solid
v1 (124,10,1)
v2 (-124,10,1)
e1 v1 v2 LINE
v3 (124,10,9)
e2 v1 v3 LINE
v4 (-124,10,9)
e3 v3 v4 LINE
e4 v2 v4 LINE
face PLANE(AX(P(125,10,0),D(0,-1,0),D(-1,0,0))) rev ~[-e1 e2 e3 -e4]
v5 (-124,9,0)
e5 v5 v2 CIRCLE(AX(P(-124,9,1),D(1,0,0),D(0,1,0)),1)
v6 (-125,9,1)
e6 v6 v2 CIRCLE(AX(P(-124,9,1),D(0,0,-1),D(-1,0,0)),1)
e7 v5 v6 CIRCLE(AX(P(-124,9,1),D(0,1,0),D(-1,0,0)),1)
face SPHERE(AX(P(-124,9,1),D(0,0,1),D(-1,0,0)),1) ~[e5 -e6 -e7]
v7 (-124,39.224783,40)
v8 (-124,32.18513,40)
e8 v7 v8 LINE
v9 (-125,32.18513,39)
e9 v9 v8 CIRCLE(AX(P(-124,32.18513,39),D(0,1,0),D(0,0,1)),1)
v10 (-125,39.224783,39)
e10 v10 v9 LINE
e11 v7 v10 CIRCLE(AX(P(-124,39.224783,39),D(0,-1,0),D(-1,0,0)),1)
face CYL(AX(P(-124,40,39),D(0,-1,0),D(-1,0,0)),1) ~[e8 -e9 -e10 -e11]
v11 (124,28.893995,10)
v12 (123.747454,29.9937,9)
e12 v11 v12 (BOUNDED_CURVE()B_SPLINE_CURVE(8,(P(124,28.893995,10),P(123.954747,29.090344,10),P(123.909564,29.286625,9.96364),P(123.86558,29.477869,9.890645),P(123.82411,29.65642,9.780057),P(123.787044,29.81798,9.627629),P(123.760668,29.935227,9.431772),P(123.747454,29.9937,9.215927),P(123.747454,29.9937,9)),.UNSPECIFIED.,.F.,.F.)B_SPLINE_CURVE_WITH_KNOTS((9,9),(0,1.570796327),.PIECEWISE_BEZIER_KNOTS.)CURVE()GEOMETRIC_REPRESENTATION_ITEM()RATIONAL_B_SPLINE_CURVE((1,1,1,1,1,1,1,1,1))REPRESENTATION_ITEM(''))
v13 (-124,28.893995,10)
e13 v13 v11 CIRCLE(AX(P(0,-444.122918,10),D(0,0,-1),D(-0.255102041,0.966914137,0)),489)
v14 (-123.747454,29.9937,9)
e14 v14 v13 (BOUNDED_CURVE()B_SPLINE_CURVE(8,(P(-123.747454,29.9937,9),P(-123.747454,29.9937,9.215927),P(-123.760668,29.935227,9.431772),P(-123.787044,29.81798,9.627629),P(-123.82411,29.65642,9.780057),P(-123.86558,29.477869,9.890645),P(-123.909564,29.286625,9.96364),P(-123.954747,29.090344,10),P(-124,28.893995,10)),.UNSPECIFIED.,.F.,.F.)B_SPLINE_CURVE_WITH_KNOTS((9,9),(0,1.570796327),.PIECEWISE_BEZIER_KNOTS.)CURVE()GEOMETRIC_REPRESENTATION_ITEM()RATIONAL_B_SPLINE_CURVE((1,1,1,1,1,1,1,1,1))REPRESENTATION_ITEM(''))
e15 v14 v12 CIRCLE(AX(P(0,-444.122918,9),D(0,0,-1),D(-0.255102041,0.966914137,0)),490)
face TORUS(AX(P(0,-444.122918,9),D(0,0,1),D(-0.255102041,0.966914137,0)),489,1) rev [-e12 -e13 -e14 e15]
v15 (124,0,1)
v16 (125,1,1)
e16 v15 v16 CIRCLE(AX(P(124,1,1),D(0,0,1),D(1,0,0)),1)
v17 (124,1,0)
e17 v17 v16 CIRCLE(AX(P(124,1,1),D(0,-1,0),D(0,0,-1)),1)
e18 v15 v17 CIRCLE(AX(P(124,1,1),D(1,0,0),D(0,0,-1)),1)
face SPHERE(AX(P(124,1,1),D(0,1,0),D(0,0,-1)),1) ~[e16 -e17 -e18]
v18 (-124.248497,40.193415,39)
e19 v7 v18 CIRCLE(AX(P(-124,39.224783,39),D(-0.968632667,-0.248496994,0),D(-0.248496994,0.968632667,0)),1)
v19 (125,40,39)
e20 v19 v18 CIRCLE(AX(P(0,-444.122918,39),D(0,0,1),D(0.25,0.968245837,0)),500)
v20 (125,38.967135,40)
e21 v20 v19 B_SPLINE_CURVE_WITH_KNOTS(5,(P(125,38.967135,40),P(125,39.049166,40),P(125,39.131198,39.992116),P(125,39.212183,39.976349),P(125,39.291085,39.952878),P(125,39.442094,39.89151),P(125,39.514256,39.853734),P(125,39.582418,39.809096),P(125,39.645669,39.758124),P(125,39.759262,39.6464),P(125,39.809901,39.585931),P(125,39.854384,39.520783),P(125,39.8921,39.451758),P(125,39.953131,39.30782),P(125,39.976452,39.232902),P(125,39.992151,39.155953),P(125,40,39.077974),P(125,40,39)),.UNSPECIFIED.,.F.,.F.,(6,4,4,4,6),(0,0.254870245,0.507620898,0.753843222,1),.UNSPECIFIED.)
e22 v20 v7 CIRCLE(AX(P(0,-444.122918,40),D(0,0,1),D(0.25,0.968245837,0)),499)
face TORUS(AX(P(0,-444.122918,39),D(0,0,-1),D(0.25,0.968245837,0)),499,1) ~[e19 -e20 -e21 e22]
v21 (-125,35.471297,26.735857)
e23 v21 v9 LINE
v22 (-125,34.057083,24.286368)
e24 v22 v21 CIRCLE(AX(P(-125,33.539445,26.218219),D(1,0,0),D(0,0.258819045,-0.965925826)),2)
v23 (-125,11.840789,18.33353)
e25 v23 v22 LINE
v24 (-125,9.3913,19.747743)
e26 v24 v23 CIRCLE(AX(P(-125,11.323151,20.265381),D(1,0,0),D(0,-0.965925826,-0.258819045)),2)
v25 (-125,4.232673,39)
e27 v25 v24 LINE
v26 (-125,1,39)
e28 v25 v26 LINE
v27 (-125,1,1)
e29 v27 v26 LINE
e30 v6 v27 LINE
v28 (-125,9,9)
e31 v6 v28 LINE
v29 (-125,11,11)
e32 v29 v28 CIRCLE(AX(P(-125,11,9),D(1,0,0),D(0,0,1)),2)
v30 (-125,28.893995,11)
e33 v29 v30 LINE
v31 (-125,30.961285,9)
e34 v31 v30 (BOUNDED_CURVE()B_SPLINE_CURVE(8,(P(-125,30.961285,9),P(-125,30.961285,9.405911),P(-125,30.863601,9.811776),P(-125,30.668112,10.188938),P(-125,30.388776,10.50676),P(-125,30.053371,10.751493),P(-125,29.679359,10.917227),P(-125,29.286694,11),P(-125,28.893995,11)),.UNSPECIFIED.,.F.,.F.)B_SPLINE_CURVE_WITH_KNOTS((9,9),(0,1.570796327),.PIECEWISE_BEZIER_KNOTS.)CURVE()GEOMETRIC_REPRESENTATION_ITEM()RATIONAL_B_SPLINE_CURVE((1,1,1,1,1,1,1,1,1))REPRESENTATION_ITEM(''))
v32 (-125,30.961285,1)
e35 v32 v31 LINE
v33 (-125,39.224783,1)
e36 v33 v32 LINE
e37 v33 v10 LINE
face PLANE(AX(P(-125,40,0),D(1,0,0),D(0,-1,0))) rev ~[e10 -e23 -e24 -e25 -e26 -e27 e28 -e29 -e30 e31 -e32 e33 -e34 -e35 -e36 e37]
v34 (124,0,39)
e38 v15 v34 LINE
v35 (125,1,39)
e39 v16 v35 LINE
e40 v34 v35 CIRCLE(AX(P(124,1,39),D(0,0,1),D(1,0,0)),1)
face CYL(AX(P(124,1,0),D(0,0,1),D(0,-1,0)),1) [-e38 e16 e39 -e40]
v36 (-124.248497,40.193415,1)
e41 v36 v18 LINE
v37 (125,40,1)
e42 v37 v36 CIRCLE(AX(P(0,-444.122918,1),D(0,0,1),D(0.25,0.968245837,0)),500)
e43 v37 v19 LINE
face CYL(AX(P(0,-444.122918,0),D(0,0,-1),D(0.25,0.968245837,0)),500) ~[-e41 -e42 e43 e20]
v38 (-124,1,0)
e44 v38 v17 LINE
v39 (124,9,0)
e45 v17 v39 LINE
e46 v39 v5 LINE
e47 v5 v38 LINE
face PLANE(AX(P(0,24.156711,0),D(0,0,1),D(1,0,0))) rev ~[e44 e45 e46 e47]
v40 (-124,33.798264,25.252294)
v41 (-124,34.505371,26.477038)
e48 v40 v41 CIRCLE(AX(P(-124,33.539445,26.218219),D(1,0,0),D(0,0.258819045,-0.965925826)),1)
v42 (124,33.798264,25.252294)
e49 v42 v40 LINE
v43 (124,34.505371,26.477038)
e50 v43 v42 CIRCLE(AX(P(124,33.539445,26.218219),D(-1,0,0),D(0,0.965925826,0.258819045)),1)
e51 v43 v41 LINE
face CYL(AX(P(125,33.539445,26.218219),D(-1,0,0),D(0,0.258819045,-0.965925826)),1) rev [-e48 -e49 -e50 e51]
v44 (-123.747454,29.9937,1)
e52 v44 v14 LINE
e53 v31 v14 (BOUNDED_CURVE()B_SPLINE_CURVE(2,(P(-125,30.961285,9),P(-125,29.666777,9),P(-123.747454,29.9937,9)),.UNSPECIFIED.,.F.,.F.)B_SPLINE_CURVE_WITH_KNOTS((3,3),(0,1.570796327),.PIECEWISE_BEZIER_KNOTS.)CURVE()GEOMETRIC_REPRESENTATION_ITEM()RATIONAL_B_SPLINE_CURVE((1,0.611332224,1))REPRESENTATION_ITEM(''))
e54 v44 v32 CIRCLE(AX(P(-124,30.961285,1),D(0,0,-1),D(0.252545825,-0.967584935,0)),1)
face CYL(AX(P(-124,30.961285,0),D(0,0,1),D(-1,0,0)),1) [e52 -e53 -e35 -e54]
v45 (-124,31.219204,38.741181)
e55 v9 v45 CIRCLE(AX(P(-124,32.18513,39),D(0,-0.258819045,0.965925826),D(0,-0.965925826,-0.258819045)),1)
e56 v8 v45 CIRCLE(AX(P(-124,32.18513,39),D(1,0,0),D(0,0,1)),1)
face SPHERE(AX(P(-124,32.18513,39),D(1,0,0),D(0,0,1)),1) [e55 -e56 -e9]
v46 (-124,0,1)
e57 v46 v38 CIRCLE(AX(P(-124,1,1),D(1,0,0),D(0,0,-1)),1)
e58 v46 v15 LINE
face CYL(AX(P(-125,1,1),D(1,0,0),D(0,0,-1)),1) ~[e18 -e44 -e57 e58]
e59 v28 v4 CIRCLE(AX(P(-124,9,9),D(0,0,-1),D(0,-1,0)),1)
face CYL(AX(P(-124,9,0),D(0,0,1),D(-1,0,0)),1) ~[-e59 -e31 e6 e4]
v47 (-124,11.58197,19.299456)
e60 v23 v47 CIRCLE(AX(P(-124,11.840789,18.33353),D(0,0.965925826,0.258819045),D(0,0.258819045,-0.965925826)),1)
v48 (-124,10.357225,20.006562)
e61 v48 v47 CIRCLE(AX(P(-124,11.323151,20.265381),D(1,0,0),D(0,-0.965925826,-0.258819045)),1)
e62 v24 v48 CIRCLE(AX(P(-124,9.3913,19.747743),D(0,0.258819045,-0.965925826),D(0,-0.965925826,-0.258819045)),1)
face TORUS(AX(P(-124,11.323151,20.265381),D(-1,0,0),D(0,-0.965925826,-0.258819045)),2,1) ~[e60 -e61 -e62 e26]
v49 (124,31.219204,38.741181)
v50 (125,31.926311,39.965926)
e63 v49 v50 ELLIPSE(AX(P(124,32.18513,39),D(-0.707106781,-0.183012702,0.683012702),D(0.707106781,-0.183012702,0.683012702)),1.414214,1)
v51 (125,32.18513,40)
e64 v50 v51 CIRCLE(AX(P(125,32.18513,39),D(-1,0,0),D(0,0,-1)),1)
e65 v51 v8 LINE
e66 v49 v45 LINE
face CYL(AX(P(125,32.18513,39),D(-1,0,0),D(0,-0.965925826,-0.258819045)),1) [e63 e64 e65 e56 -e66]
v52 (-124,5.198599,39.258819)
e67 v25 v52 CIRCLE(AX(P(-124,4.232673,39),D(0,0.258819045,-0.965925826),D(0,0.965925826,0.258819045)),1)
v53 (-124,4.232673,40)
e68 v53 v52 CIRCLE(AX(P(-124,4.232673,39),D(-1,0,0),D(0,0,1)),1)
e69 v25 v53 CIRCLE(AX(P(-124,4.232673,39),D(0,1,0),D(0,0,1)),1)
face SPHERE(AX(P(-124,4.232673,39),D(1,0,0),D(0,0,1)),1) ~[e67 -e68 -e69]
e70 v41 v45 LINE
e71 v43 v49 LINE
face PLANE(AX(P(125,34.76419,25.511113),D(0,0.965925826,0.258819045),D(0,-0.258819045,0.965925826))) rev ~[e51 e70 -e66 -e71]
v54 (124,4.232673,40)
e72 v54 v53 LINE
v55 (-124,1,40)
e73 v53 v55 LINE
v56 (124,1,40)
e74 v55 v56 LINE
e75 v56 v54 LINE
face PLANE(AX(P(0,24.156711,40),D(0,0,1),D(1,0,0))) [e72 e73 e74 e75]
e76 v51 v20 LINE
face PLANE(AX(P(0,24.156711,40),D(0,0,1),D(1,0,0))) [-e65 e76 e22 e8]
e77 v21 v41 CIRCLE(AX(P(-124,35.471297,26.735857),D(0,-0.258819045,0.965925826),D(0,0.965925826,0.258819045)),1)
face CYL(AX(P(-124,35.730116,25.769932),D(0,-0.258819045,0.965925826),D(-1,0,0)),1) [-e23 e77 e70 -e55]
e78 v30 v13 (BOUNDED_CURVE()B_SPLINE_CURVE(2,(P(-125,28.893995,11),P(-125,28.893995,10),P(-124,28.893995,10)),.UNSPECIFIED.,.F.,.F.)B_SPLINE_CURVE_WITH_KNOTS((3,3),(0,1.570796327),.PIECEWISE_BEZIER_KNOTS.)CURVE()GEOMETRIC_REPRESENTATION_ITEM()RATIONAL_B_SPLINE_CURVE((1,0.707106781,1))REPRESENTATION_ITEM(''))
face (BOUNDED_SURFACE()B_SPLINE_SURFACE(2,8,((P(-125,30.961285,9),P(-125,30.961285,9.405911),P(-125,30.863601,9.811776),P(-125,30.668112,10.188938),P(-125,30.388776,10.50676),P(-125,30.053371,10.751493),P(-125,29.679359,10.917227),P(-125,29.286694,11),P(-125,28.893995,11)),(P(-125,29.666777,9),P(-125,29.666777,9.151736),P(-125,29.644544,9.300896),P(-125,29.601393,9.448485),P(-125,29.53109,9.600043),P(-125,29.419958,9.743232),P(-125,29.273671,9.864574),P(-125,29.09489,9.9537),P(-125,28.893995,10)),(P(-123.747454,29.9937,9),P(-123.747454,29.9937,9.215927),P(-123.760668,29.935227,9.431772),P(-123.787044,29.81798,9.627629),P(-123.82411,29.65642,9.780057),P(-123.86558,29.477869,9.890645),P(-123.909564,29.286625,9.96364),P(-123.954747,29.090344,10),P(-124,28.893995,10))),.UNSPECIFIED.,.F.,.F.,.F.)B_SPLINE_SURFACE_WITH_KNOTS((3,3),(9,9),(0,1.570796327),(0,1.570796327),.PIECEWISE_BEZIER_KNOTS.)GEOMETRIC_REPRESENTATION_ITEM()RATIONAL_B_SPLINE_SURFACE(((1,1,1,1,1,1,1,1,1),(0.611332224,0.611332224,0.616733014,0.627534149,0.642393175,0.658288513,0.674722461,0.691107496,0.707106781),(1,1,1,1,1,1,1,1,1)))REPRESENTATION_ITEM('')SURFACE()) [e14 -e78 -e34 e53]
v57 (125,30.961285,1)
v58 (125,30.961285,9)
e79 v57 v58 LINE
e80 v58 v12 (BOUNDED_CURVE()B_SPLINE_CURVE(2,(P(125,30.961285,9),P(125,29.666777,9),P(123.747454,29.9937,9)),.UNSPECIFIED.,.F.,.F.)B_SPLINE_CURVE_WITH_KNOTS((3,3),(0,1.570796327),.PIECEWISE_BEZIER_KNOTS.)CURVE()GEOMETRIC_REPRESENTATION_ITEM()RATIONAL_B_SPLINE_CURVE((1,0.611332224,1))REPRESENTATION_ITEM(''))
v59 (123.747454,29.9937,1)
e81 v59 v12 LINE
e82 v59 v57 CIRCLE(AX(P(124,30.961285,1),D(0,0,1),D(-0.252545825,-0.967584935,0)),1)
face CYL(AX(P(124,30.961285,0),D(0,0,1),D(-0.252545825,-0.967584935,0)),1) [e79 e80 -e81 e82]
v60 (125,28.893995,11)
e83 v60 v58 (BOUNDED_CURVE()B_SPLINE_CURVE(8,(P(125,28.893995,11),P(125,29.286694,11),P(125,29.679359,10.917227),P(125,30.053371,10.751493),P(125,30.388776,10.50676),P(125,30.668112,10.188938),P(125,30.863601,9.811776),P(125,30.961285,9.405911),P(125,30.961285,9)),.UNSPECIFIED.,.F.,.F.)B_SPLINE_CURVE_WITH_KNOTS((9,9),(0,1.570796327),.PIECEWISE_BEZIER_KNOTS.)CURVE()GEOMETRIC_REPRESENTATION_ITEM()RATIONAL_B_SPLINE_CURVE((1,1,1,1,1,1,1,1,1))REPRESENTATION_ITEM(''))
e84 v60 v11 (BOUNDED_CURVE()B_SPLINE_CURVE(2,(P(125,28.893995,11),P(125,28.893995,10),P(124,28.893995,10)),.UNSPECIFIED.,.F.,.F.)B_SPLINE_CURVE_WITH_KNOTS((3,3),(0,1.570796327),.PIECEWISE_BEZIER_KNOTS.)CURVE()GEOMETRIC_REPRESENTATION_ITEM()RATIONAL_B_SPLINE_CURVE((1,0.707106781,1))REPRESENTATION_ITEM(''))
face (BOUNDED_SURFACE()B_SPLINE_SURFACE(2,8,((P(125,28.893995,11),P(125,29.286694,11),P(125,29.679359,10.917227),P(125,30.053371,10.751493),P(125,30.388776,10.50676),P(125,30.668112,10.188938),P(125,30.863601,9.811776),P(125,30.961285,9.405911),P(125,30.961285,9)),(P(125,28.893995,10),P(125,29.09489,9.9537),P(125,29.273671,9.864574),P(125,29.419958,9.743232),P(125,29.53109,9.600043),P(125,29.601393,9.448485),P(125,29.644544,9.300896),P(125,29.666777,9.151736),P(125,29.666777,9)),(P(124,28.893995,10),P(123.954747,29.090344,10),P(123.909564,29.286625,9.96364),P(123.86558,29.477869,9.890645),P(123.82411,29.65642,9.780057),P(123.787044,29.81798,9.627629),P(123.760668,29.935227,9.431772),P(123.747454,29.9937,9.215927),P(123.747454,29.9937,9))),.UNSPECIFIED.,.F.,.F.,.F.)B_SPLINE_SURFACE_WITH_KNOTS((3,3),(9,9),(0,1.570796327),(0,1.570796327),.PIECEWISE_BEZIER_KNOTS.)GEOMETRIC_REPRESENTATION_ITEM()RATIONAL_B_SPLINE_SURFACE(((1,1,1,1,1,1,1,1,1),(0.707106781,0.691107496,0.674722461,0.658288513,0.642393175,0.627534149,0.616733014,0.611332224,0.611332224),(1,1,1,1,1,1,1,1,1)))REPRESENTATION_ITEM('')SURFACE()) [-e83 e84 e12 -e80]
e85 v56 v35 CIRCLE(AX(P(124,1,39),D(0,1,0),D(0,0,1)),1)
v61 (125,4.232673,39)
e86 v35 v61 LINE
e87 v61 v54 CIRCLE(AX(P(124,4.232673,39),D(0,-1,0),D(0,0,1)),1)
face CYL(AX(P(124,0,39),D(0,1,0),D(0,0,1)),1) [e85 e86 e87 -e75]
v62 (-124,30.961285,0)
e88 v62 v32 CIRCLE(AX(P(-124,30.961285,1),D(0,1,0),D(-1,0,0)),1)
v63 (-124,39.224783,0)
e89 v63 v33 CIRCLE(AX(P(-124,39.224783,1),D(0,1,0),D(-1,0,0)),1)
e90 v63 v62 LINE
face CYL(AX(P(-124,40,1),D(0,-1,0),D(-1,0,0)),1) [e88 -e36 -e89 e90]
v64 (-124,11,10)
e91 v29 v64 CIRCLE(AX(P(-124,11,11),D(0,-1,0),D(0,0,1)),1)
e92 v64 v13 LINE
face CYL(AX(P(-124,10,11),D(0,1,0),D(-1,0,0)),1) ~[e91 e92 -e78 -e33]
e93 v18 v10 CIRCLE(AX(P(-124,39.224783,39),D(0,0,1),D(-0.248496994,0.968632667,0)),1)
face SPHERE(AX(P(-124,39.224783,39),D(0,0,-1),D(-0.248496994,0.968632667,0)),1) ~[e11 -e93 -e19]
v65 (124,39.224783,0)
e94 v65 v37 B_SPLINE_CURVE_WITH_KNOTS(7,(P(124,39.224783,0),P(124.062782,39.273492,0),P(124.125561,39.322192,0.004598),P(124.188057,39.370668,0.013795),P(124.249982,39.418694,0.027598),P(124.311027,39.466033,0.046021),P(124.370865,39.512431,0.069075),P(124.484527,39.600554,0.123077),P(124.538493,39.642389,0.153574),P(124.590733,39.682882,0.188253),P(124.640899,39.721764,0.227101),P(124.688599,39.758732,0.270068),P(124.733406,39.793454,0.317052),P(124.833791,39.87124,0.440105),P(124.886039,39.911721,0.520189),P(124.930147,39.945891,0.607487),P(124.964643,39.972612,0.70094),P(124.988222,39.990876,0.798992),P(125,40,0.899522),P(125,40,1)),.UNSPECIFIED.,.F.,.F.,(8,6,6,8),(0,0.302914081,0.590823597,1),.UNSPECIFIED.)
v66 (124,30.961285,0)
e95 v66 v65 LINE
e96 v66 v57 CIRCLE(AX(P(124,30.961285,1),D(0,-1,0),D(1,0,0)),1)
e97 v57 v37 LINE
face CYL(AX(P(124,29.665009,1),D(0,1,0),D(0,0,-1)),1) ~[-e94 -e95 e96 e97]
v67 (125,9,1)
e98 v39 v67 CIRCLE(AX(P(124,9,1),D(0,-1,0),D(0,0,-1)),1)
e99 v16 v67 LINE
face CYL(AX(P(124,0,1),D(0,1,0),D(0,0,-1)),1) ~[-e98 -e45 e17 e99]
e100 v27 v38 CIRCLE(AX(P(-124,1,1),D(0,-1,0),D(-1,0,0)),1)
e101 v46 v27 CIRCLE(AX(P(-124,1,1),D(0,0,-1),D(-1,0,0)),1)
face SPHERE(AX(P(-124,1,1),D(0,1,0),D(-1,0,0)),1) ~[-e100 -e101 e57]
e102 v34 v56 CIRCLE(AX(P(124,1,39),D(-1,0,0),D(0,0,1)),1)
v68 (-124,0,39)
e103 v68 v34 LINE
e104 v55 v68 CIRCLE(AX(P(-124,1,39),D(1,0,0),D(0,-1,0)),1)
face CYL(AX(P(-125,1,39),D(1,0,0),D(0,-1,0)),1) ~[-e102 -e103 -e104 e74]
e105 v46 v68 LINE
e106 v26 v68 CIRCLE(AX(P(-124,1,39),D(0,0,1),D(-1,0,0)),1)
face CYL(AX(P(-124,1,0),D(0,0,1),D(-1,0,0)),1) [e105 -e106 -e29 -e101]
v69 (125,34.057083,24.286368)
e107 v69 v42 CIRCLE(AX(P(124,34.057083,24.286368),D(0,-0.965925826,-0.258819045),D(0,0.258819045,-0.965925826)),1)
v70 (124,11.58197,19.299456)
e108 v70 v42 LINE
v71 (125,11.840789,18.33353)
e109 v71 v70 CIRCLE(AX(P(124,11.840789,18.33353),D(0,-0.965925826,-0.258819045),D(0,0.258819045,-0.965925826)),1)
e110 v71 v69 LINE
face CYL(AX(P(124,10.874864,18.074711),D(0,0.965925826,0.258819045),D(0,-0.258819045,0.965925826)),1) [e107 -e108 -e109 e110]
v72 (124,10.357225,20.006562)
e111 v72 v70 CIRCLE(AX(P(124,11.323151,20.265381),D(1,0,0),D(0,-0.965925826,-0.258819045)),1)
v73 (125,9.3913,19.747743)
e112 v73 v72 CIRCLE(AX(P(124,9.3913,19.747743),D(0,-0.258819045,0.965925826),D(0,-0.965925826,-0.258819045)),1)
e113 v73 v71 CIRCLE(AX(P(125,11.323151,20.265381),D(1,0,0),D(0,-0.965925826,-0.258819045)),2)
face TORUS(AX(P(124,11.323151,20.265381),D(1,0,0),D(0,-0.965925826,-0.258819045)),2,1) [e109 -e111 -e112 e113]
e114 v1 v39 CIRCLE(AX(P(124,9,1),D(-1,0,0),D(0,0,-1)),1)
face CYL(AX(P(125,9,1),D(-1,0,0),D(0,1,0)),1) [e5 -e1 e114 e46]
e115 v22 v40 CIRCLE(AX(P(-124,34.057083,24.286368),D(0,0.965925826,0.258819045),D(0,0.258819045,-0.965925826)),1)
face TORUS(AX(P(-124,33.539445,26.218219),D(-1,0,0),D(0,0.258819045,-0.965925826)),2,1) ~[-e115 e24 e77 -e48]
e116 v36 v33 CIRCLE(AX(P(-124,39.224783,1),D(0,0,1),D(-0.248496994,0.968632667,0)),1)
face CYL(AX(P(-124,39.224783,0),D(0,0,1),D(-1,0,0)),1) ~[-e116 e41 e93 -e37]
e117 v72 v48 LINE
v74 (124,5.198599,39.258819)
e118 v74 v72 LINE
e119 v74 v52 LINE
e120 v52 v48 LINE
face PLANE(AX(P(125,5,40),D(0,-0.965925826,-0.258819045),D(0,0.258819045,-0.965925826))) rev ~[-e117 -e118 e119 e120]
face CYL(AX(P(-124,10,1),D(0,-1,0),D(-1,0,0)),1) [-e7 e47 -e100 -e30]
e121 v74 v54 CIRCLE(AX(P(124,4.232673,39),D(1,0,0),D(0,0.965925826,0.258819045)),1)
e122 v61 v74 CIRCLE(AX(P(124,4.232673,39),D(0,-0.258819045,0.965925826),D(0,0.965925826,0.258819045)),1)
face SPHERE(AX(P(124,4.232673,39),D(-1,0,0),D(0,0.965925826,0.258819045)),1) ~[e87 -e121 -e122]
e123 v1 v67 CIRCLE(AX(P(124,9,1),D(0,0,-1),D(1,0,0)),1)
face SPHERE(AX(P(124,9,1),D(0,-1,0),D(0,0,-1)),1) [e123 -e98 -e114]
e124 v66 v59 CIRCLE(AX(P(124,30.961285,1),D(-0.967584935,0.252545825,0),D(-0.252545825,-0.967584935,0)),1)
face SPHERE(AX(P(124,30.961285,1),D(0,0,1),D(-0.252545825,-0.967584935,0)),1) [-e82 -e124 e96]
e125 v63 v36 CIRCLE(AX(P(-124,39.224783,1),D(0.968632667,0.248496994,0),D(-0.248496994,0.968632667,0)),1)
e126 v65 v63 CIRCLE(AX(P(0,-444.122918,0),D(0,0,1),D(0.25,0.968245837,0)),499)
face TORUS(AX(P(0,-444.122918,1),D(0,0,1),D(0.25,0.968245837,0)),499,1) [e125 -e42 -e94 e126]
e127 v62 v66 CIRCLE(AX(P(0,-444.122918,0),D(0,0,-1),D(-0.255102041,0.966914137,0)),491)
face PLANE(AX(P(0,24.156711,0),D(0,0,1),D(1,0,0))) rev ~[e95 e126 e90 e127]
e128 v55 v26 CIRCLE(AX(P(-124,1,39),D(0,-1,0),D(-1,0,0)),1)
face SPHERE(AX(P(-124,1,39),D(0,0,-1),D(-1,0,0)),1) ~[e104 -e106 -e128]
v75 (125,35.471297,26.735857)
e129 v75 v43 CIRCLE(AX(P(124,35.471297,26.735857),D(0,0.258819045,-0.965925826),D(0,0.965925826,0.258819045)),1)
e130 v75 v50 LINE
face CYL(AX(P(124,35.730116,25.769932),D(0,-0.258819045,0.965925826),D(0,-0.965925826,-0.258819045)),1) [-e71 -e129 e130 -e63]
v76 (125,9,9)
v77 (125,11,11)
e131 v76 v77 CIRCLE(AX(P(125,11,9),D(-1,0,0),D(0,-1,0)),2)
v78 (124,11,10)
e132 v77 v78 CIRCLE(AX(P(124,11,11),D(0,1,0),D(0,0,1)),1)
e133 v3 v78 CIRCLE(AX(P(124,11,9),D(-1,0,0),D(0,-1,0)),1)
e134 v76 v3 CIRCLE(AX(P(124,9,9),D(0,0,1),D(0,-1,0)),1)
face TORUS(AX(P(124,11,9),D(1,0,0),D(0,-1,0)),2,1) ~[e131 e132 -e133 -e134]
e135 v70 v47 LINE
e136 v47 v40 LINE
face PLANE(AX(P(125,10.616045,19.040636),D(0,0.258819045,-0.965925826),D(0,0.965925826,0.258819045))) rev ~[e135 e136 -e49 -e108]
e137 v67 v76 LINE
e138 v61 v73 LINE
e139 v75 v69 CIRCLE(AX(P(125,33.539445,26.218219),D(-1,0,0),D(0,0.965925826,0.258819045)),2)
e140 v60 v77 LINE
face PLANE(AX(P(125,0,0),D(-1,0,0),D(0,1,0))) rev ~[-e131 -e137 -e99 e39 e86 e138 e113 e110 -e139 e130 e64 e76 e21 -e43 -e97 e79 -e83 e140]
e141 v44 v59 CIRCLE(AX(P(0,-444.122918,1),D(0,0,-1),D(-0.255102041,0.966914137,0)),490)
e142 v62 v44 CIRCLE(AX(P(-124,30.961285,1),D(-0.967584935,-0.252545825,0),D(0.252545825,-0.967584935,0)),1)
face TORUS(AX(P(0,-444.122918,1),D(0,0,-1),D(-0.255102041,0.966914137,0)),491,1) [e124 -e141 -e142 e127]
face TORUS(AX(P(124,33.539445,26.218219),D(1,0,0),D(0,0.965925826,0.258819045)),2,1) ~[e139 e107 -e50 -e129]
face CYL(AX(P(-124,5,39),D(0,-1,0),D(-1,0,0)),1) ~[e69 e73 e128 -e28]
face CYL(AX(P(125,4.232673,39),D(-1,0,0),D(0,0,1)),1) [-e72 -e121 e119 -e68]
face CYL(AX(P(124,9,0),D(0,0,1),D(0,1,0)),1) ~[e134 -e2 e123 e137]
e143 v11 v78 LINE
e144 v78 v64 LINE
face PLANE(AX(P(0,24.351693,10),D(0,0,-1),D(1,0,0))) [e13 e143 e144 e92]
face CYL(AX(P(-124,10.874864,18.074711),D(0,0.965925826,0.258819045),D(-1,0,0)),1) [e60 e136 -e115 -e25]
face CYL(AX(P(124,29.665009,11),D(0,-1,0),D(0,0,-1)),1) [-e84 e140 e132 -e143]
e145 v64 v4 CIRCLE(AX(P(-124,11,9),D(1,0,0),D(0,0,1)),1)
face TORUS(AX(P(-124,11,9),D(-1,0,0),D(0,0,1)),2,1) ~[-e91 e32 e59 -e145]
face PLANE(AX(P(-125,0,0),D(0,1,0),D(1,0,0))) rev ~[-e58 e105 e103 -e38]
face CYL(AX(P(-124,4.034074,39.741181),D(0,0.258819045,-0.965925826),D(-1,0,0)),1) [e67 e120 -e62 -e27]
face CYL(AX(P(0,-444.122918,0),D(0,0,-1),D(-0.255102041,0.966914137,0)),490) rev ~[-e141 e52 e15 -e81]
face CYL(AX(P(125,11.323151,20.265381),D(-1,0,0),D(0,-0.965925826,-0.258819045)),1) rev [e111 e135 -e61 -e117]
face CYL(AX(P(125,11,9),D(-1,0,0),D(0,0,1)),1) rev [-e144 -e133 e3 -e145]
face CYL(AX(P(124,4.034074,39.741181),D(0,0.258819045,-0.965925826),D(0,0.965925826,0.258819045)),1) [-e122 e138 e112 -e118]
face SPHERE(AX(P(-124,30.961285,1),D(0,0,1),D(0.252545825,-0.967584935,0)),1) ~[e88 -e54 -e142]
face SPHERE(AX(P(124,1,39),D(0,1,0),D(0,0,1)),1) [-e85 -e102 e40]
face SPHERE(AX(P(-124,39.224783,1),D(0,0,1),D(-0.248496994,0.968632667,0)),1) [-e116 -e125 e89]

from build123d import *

# Parameters (mm, degrees)
F1_DEPTH = 40
F3_DEPTH = 250.001
F5_DEPTH = 10
F6_R     = 1


with BuildPart() as f1:
    # F0 (on Top) → F1 (new body)
    with BuildSketch(Plane.XY):
        with BuildLine():
            Line((-125, 40), (-125, 0))
            Line((-125, 0), (125, 0))
            Line((125, 0), (125, 40))
            ThreePointArc((125, 40), (0, 55.8770817241), (-125, 40))
        make_face()
    extrude(amount=F1_DEPTH)

    # F2 (on face) → F3 (cut, through all)
    with BuildSketch(Plane.YZ.offset(125)):
        Polygon((5, 40), (10.6160445296, 19.0406364781), (34.7641901868, 25.5111126057), (30.8819045103, 40), align=None)
    extrude(amount=-F3_DEPTH, mode=Mode.SUBTRACT)

    # F4 (on face) → F5 (cut)
    with BuildSketch(Plane(origin=(0, 0, 0), x_dir=(1, 0, 0), z_dir=(0, 0, -1))):
        with BuildLine():
            ThreePointArc((-125, -29.6650089658), (0, -45.8770817241), (125, -29.6650089658))
            Line((125, -29.6650089658), (125, -10))
            Line((125, -10), (-125, -10))
            Line((-125, -10), (-125, -29.6650089658))
        make_face()
    extrude(amount=-F5_DEPTH, mode=Mode.SUBTRACT)

    # F6
    f6_edges = [f1.edges().sort_by_distance(p)[0] for p in [
        (0, 55.877082, 40),
        (0, 30.881905, 40),
        (-125, 35.440952, 40),
        (-125, 34.832504, 0),
        (-125, 29.665009, 5),
        (-125, 19.832504, 10),
        (-125, 10, 5),
        (-125, 5, 0),
        (-125, 0, 20),
        (-125, 2.5, 40),
        (-125, 7.808022, 29.520318),
        (-125, 22.690117, 22.275875),
        (-125, 32.823047, 32.755556),
        (-125, 40, 20),
        (125, 22.690117, 22.275875),
        (0, 34.76419, 25.511113),
        (0, 10.616045, 19.040636),
        (125, 2.5, 40),
        (0, 0, 40),
        (0, 5, 40),
        (0, 45.877082, 10),
        (125, 19.832504, 10),
        (0, 10, 10),
        (125, 29.665009, 5),
        (0, 45.877082, 0),
        (125, 34.832504, 0),
        (0, 55.877082, 0),
        (125, 5, 0),
        (0, 0, 0),
        (0, 10, 0),
        (125, 0, 20),
        (125, 10, 5),
        (125, 32.823047, 32.755556),
        (125, 7.808022, 29.520318),
    ]]
    fillet(f6_edges, radius=F6_R)


solid = f1.part
